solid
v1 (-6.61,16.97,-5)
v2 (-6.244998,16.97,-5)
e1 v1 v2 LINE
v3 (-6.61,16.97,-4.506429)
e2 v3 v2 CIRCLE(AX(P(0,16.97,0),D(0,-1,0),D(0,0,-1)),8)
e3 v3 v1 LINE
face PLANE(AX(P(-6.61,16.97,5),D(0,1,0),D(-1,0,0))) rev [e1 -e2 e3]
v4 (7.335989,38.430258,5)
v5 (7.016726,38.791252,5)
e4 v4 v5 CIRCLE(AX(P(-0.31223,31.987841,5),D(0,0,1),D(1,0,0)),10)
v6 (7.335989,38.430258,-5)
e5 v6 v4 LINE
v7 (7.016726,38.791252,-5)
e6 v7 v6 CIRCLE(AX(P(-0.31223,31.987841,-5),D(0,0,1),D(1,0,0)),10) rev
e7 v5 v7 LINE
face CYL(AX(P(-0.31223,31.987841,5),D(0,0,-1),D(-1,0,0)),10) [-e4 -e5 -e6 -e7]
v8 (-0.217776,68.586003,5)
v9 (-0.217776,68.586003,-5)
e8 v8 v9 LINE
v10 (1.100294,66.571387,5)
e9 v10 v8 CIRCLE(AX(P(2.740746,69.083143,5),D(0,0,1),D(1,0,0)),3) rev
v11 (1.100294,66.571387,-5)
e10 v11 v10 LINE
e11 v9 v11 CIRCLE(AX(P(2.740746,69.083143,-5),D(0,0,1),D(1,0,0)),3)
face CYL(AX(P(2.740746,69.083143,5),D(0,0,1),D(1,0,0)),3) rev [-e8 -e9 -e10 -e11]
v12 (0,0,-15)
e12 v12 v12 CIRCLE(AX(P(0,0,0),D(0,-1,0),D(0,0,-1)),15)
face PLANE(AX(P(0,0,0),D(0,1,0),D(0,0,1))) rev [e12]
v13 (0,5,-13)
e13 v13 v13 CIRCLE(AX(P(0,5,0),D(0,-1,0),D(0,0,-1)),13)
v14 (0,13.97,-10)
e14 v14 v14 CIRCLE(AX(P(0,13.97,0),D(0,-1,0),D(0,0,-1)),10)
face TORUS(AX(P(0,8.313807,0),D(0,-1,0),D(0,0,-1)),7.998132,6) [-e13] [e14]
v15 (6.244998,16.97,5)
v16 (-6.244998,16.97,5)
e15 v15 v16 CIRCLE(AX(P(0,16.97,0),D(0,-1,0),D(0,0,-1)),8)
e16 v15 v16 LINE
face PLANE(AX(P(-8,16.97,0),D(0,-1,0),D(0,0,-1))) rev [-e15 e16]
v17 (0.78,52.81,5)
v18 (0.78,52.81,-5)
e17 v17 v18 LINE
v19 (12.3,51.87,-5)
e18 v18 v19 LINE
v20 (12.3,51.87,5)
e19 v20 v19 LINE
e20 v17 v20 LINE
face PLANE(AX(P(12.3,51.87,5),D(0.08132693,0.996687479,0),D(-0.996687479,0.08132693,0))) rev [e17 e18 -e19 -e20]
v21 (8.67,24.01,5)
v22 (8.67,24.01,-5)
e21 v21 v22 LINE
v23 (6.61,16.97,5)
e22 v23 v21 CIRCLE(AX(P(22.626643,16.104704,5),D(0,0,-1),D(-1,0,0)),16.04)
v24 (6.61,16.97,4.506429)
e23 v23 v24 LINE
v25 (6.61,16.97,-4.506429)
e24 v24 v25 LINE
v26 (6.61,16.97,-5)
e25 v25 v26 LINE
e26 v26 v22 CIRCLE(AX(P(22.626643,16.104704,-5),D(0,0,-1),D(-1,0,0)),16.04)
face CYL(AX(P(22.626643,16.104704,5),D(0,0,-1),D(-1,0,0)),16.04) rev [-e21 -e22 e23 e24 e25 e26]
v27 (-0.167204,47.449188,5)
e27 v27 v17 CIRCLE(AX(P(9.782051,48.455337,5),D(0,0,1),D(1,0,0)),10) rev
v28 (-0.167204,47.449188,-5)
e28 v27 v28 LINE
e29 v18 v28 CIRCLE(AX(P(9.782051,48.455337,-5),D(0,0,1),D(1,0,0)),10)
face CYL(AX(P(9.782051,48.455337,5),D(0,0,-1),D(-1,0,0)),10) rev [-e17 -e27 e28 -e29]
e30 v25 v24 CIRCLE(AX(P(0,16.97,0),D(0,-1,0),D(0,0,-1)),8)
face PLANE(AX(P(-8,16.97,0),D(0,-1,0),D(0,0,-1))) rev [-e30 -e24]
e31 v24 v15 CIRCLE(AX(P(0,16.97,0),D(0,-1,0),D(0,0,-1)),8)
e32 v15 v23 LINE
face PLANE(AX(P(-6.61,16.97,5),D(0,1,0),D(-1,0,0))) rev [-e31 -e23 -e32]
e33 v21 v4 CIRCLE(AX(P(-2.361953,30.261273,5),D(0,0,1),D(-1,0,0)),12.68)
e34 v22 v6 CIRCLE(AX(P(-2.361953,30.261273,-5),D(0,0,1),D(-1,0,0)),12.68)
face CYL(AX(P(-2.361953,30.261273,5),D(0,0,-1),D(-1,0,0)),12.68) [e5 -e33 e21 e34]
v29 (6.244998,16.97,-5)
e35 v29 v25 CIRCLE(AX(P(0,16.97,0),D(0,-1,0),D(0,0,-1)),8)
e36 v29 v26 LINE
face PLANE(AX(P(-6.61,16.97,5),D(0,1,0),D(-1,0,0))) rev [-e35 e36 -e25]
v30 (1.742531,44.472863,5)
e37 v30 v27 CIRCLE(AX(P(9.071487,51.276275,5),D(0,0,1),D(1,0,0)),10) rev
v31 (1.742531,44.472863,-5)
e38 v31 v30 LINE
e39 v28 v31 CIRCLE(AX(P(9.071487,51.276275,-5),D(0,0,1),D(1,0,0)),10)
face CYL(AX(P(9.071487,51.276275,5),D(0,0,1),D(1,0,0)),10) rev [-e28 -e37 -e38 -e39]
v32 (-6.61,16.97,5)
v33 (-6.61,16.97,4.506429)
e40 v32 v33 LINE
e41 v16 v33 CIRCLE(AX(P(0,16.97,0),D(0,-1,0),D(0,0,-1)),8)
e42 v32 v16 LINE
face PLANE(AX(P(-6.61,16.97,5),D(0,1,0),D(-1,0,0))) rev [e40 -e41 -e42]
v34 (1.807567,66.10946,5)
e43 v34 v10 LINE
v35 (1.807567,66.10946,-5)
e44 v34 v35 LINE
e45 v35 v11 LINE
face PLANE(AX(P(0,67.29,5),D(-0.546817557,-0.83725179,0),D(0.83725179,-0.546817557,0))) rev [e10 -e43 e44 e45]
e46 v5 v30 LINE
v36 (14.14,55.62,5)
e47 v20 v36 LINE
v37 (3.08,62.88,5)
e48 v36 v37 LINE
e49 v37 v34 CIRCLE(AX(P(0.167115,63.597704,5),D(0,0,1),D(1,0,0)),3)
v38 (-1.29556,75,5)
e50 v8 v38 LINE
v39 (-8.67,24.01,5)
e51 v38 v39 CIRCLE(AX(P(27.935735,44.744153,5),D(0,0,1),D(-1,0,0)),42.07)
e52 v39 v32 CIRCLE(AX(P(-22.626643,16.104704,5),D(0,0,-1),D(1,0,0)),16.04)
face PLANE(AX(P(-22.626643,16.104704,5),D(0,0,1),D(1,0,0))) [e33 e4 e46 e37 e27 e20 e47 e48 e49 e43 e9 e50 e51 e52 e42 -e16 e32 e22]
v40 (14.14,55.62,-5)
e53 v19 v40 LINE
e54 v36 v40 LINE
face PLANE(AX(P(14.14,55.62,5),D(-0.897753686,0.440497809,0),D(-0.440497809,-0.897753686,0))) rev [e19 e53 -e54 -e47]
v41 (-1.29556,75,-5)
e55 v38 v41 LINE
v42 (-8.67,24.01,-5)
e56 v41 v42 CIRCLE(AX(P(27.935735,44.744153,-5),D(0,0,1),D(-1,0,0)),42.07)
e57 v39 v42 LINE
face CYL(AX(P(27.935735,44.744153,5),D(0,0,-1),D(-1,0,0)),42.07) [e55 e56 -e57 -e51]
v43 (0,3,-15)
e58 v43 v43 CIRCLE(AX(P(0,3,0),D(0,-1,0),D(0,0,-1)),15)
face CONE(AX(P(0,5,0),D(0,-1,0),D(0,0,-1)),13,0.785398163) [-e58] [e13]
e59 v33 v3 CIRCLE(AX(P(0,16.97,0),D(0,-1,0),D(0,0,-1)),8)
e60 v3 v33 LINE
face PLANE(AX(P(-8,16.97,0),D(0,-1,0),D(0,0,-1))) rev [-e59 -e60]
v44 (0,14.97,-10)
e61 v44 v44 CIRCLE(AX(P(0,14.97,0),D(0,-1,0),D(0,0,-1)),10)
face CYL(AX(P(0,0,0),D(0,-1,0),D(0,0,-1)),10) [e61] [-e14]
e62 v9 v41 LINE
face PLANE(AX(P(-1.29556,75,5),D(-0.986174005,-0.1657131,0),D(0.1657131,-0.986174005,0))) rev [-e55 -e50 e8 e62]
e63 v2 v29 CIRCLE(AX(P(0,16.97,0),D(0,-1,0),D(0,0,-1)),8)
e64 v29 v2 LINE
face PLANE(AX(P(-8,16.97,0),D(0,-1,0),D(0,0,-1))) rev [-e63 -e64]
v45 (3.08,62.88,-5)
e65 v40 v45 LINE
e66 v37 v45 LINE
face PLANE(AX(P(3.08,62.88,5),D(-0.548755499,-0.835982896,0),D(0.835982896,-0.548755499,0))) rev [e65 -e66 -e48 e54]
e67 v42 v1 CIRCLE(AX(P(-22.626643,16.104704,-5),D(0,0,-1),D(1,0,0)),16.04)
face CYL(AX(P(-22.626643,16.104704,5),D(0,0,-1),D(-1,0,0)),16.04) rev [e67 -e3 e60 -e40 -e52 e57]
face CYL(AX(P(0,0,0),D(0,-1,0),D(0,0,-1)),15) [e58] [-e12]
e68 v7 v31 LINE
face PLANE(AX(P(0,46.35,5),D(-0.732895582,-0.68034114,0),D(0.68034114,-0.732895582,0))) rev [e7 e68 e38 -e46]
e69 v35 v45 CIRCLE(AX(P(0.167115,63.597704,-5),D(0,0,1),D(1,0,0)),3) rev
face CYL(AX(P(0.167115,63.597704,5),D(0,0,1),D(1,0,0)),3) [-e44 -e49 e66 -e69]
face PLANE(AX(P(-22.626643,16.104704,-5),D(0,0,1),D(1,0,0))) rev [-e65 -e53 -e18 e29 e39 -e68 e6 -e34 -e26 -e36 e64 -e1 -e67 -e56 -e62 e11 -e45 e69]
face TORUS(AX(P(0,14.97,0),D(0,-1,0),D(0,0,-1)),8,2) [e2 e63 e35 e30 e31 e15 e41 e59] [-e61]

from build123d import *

# Parameters (mm, degrees)
BOSS_EXTRUDE1_DEPTH = 5
FILLET1_R           = 3
FILLET2_R           = 10
FILLET3_R           = 3


with BuildPart() as part:
    # Sketch1 → Revolve1 (revolve)
    with BuildSketch(Plane.XY, mode=Mode.PRIVATE) as revolve1_sk:
        with BuildLine():
            Line((0, 0), (-15, 0))
            Line((-15, 0), (-15, 3))
            Line((-15, 3), (-13, 5))
            ThreePointArc((-13, 5), (-13.688325627, 10.216881481), (-10, 13.97))
            Line((-10, 13.97), (-10, 14.97))
            ThreePointArc((-10, 14.97), (-9.414213562, 16.384213562), (-8, 16.97))
            Line((-8, 16.97), (0, 16.97))
            Line((0, 16.97), (0, 0))
        make_face()
    revolve(revolve1_sk.sketch.rotate(Axis((0, 0, 0), (0, 1, 0)), 270), axis=Axis((0, 0, 0), (0, 1, 0)))

    # Sketch2 → Boss-Extrude1 (add, symmetric)
    with BuildSketch(Plane.XY):
        with BuildLine():
            Line((-6.61, 16.97), (6.61, 16.97))
            ThreePointArc((6.61, 16.97), (7.232167752, 20.609337277), (8.67, 24.01))
            ThreePointArc((8.67, 24.01), (10.247857058, 31.593597712), (7.12, 38.68))
            Line((7.12, 38.68), (0, 46.35))
            Line((0, 46.35), (-1, 50.32))
            Line((-1, 50.32), (0.78, 52.81))
            Line((0.78, 52.81), (12.3, 51.87))
            Line((12.3, 51.87), (14.14, 55.62))
            Line((14.14, 55.62), (3.08, 62.88))
            Line((3.08, 62.88), (4.18, 64.56))
            Line((4.18, 64.56), (0, 67.29))
            Line((0, 67.29), (-1.295560409, 75))
            ThreePointArc((-1.295560409, 75), (-13.70107173, 50.765884766), (-8.67, 24.01))
            ThreePointArc((-8.67, 24.01), (-7.232167752, 20.609337277), (-6.61, 16.97))
        make_face()
    extrude(amount=BOSS_EXTRUDE1_DEPTH, both=True)

    # Fillet1
    fillet1_edges = [part.edges().sort_by_distance(p)[0] for p in [
        (0, 67.29, 0),
    ]]
    fillet(fillet1_edges, radius=FILLET1_R)

    # Fillet2
    # the kernel refuses this fillet: 10 mm, written as the material it adds along each edge
    with BuildSketch(Plane(origin=(-1, 50.32, -5), x_dir=(0.5815472036077696, 0.8135126612265992, 0), z_dir=(0, 0, 1))) as fillet2_piece_1:
        with BuildLine():
            CenterArc((4.753344766, -9.855723924), FILLET2_R, 99.744472398, 39.953038391)
            Line((-2.873057527, -3.387494795), (0, 0))
            Line((0, 0), (3.060800549, 0))
        make_face()
    extrude(amount=10)
    with BuildSketch(Plane(origin=(0, 46.35, -5), x_dir=(-0.24425942618290672, 0.9697099219461441, 0), z_dir=(0, 0, 1))) as fillet2_piece_2:
        with BuildLine():
            CenterArc((FILLET2_R * 0.256126103546, -FILLET2_R), FILLET2_R, 90, 28.732234305)
            Line((-FILLET2_R * 0.224590795698, -FILLET2_R * 0.123124146312), (0, 0))
            Line((0, 0), (FILLET2_R * 0.256126103546, 0))
        make_face()
    extrude(amount=10)
    # the kernel refuses this fillet: 10 mm, written as the material it takes off along each edge
    with BuildSketch(Plane(origin=(7.12, 38.68, -5.825464024), x_dir=(-0.6803411396995018, 0.7328955816706653, 0), z_dir=(0, 0, 1))) as fillet2_2_piece_1:
        with BuildLine():
            CenterArc((0.151797952, 10), FILLET2_R, 267.238538955, 2.761461045)
            ThreePointArc((-0.32998135, 0.011612307), (-0.165028474, 0.004732024), (0, 0))
            Line((0, 0), (0.151797952, 0))
        make_face()
    extrude(amount=11.650928049, mode=Mode.SUBTRACT)

    # Fillet3
    # the kernel refuses this fillet: 3 mm, written as the material it takes off along each edge
    with BuildSketch(Plane(origin=(4.18, 64.56, -12.08398788), x_dir=(-0.5477859413637723, -0.8366185286283144, 0), z_dir=(0, 0, 1))) as fillet3_piece_1:
        with BuildLine():
            CenterArc((3.003276632, -2.830122074), FILLET3_R, 109.373873229, 70.692421457)
            Line((0.00327864, -2.833593255), (-0.056721319, -2.833662679))
            Line((-0.056721319, -2.833662679), (-0.05999996, -6.9424e-05))
            Line((-0.05999996, -6.9424e-05), (0, 0.06))
            ThreePointArc((0, 0.06), (1.004041832, 0.06), (1.988179804, 0.056602441))
            Line((1.988179804, 0.056602441), (2.008083664, 0))
        make_face()
    extrude(amount=24.16797576, mode=Mode.SUBTRACT)


solid = part.part
